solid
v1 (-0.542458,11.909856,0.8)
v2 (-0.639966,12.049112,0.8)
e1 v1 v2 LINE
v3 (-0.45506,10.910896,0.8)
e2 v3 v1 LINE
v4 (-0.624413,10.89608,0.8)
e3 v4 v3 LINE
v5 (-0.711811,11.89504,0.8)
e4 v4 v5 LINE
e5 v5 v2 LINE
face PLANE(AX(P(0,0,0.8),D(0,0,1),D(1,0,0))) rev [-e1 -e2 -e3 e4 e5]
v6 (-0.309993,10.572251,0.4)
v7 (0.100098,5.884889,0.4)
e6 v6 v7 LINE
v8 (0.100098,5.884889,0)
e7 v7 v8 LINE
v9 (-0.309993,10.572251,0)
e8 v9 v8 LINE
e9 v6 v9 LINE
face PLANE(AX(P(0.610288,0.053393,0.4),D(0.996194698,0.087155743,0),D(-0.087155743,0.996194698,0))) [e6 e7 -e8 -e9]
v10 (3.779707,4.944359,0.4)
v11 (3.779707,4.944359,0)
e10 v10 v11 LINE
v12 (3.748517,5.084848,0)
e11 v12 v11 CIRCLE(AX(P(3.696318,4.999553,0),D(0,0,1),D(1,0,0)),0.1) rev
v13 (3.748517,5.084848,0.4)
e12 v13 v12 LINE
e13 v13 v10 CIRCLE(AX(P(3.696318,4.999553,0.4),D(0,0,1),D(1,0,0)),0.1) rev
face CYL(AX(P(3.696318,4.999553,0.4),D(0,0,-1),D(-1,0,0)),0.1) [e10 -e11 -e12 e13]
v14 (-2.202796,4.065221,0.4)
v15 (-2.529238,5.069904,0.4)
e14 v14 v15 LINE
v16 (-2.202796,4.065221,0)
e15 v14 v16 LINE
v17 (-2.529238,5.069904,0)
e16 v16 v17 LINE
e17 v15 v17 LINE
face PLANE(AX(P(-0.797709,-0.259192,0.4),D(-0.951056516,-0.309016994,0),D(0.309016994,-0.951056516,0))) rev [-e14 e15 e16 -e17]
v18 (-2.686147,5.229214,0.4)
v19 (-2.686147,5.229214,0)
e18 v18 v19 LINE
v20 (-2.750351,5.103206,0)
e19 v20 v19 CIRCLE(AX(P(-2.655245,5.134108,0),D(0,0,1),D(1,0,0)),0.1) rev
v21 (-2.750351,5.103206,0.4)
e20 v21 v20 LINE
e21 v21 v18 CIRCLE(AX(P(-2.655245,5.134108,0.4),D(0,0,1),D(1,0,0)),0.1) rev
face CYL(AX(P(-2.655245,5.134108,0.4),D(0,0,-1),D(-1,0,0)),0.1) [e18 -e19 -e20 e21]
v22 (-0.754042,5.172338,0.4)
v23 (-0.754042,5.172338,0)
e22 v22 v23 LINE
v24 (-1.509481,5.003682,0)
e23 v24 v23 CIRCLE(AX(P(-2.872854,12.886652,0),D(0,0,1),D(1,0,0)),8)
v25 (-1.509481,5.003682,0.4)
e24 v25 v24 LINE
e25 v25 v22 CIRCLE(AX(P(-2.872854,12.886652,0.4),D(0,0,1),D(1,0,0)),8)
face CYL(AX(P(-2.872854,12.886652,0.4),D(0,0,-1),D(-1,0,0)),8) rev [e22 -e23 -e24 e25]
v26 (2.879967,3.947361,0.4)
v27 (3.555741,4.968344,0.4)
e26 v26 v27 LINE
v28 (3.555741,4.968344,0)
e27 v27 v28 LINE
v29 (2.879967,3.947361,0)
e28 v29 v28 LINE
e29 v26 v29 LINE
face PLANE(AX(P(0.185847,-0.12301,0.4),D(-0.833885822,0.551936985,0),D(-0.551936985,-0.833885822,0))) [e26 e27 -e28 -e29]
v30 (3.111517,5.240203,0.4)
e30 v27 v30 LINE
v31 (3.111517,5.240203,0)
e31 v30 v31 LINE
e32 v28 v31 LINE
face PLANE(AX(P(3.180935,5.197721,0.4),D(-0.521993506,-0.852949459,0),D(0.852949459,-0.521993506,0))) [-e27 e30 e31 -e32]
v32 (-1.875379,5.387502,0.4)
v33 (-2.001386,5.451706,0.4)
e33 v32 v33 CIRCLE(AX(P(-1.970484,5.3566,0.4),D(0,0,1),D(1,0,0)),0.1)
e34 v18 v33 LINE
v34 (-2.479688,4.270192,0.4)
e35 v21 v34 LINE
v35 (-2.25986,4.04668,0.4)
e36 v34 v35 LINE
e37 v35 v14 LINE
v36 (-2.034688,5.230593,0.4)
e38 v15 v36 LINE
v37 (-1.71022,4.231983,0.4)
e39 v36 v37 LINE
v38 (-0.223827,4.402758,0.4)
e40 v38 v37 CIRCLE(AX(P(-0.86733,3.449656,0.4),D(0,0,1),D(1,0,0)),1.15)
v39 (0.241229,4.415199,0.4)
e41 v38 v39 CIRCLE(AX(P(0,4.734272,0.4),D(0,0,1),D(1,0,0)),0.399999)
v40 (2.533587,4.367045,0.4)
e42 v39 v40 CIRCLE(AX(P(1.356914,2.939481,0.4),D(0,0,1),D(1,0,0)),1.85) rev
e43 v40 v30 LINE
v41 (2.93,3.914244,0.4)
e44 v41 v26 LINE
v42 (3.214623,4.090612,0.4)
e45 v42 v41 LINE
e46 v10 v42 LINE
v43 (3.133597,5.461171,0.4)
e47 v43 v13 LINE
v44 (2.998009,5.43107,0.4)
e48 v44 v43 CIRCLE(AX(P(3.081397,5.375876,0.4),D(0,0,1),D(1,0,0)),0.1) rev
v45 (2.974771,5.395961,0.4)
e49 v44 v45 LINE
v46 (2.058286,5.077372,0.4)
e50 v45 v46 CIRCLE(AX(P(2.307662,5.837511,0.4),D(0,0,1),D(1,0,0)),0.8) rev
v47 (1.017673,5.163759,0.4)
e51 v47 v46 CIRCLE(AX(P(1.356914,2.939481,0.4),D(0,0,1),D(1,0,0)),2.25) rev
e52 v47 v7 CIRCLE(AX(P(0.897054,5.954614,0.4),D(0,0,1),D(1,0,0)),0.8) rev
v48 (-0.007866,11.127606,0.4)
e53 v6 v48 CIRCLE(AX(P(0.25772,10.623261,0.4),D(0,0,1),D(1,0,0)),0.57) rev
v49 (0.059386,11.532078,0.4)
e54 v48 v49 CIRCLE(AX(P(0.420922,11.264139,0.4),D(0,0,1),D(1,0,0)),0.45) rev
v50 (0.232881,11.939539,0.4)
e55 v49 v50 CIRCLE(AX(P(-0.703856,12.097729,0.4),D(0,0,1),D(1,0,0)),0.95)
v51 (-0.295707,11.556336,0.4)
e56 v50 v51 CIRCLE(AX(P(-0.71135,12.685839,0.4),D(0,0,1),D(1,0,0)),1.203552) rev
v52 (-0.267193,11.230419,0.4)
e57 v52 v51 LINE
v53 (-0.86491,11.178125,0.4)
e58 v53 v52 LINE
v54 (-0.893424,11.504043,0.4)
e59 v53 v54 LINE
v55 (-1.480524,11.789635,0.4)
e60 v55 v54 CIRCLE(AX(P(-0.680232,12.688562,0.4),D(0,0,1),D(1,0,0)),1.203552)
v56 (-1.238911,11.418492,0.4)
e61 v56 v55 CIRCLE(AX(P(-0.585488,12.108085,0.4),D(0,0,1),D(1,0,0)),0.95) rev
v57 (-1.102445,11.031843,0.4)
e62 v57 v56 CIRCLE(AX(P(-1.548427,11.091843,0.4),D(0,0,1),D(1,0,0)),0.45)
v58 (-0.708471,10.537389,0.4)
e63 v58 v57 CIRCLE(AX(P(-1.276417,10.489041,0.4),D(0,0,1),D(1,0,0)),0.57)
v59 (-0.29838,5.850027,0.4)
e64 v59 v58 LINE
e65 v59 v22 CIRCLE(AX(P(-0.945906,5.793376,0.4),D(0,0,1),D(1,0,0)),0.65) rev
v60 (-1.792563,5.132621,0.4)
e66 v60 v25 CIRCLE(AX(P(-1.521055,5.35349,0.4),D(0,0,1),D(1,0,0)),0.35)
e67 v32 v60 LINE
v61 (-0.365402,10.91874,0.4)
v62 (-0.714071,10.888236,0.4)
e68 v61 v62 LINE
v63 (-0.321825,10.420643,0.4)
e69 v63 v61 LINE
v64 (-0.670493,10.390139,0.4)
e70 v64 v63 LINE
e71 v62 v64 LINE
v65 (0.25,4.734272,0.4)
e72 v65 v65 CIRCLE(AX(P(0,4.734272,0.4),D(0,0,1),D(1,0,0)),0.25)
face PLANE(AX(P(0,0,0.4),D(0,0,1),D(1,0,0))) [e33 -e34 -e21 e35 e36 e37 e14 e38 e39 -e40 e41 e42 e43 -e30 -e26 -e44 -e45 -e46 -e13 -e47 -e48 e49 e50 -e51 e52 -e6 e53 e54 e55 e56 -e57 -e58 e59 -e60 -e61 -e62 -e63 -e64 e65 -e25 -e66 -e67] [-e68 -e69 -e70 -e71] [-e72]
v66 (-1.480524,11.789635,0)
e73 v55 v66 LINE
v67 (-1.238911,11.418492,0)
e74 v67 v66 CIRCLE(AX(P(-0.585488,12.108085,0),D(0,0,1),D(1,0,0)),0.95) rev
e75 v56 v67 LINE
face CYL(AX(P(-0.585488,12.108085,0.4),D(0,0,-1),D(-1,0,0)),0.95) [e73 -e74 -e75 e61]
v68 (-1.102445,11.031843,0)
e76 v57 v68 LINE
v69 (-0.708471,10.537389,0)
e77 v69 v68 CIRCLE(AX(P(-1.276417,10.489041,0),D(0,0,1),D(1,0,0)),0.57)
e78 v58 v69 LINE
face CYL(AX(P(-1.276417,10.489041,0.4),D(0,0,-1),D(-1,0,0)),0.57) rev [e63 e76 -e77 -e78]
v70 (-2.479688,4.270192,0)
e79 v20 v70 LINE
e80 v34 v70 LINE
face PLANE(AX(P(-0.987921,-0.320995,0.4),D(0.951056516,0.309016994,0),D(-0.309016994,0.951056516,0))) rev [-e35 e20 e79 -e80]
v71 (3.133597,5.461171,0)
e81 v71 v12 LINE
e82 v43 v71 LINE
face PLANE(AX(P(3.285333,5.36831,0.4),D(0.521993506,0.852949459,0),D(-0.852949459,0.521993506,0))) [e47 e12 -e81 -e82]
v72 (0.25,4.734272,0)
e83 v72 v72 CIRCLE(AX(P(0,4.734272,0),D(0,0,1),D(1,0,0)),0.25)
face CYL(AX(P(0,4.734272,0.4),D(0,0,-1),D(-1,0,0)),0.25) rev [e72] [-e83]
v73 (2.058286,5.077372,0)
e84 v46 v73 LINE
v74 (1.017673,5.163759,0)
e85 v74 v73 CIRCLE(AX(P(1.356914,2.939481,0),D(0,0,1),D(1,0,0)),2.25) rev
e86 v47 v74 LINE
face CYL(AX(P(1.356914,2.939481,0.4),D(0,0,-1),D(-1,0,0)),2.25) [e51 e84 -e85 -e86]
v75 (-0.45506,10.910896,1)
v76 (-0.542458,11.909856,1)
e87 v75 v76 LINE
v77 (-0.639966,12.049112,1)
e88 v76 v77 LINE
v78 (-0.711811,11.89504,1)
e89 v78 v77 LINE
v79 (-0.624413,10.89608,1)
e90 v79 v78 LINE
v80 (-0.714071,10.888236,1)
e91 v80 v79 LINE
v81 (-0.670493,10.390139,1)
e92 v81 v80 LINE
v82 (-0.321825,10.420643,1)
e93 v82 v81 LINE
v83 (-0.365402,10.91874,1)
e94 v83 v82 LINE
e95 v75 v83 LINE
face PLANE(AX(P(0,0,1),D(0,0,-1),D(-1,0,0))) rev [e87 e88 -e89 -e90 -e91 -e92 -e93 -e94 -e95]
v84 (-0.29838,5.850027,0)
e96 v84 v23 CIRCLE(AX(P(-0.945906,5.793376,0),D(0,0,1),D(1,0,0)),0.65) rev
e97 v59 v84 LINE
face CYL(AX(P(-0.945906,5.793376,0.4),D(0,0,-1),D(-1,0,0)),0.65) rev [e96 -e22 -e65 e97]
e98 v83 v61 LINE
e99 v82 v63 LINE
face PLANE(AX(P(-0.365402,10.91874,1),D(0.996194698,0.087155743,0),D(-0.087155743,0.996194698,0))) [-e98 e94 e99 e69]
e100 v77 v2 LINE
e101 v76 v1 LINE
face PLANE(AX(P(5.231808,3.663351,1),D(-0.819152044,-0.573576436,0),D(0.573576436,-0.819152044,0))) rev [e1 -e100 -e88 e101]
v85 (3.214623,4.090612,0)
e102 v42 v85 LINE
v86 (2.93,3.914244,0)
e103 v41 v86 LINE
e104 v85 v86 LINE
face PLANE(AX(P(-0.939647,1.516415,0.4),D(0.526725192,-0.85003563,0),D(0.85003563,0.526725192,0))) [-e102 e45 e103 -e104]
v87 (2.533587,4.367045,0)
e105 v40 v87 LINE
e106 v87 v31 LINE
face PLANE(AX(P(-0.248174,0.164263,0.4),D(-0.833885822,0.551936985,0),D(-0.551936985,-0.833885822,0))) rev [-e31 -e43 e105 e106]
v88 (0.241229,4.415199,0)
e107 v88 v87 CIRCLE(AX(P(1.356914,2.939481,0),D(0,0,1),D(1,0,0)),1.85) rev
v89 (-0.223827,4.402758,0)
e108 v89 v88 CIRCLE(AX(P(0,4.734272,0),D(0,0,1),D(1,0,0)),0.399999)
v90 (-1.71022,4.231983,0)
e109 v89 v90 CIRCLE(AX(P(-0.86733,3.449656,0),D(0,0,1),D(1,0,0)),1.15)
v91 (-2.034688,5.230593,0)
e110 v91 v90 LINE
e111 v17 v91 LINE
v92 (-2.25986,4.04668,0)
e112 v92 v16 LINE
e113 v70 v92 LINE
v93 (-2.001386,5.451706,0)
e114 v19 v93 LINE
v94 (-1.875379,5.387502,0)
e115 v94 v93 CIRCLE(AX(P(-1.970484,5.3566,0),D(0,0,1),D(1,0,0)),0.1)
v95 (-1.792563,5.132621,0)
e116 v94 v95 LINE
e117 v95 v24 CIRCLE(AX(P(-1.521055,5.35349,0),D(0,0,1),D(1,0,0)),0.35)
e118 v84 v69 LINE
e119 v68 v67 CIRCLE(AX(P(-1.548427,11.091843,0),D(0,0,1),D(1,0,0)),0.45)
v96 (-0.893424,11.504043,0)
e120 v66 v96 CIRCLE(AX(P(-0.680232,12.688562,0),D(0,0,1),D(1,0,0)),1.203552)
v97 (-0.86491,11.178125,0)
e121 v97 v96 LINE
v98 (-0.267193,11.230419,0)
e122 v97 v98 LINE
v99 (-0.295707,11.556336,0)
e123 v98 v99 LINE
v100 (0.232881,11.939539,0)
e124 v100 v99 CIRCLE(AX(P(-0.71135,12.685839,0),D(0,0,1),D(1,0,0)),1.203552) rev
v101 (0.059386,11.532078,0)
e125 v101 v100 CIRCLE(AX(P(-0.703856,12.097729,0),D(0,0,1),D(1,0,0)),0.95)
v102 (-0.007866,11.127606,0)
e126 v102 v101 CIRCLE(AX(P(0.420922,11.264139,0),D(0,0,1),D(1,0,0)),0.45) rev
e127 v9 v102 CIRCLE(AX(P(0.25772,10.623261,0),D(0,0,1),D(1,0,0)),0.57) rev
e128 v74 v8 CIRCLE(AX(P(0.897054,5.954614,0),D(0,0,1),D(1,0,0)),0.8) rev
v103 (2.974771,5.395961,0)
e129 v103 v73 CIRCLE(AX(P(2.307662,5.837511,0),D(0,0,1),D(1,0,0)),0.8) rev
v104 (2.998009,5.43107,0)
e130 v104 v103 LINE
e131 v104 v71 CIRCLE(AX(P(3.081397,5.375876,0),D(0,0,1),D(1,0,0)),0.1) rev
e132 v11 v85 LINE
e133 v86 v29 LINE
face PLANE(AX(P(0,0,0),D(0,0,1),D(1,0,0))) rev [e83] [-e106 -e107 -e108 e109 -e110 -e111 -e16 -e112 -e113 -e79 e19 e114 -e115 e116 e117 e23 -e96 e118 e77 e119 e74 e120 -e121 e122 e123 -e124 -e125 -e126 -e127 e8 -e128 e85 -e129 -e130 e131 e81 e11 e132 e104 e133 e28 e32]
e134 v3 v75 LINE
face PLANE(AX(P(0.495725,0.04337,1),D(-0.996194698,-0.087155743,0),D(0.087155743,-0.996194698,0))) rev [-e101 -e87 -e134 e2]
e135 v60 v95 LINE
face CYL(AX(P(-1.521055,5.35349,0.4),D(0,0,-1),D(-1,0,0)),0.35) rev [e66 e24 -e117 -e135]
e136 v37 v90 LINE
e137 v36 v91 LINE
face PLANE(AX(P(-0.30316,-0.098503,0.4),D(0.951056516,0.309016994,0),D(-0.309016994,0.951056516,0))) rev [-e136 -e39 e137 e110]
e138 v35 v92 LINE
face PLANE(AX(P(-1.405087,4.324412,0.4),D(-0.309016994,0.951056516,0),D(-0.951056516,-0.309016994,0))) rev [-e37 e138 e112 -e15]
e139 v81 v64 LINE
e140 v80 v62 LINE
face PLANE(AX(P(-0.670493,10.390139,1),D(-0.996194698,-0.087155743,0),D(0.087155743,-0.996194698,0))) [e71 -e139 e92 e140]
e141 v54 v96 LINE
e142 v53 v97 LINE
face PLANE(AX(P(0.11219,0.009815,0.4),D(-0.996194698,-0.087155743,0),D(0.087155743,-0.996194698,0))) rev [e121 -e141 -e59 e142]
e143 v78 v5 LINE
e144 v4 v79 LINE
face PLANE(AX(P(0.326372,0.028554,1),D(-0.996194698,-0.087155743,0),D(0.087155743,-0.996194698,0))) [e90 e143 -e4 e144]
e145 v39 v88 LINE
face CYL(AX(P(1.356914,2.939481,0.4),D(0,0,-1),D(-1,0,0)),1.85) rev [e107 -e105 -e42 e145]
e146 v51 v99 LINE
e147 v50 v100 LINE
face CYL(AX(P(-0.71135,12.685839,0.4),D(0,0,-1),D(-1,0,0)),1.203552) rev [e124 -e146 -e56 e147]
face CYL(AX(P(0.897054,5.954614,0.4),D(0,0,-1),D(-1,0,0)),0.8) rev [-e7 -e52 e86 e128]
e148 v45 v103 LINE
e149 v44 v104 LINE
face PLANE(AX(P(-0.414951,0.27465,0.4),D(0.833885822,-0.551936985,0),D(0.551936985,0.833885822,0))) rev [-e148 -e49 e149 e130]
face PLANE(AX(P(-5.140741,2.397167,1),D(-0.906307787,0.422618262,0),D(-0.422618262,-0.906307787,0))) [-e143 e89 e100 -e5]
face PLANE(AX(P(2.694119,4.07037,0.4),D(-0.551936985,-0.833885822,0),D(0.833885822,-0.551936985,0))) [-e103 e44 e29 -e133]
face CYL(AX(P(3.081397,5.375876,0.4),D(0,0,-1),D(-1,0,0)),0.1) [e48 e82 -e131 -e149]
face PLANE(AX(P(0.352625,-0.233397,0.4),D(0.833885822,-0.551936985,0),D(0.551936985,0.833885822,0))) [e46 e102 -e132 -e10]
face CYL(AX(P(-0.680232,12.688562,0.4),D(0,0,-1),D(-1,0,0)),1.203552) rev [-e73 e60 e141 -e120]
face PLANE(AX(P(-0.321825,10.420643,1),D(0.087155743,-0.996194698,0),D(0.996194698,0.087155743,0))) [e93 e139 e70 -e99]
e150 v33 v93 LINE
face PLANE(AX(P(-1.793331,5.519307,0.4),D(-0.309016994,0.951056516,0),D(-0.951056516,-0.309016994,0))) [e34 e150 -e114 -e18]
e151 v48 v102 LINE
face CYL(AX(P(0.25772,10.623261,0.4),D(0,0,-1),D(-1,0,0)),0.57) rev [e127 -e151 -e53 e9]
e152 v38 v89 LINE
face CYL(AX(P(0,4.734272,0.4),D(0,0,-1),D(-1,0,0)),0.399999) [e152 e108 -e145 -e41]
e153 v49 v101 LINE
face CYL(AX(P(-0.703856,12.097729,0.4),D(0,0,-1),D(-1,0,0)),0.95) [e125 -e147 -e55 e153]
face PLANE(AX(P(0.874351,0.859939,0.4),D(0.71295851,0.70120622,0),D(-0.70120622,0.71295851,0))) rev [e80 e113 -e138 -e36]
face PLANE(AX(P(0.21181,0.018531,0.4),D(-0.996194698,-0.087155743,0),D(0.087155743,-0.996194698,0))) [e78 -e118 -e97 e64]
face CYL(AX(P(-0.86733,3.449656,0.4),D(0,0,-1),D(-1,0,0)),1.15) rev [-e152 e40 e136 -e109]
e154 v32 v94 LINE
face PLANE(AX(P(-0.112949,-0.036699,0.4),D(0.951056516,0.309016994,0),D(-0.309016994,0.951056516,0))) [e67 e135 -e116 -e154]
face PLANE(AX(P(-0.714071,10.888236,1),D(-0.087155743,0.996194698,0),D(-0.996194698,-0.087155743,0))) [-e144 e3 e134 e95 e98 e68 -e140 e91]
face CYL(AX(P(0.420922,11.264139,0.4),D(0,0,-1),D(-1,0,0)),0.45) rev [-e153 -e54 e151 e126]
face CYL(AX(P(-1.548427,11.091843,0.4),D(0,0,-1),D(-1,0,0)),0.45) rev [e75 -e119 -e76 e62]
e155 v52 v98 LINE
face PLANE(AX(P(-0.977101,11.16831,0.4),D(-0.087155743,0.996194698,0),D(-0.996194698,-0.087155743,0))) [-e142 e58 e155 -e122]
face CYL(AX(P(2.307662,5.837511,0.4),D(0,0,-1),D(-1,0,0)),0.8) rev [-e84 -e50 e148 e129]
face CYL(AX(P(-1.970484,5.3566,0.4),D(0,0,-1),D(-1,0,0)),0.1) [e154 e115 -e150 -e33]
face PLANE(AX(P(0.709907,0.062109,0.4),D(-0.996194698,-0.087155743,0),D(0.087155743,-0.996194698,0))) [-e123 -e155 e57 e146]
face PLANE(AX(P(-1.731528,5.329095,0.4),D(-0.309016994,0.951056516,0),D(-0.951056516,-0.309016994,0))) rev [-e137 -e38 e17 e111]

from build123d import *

# Parameters (mm, degrees)
BOSS_EXTRUDE1_OUTLINE_R = 0.25
BOSS_EXTRUDE1_DEPTH     = 0.4
BOSS_EXTRUDE2_DEPTH     = 1
BOSS_EXTRUDE3_START     = 0.8
BOSS_EXTRUDE3_DEPTH     = 0.2


# Read off the part's stored shape, not the designer's step: Boss-Extrude1
with BuildPart() as part:
    # Boss-Extrude1 outline → Boss-Extrude1 (new body)
    with BuildSketch(Plane.XY):
        with BuildLine():
            ThreePointArc((0.232880573, 11.939538652), (-0.004933085, 11.711410613), (-0.295707305, 11.556336146))
            Line((-0.295707305, 11.556336146), (-0.267193244, 11.23041893))
            Line((-0.267193244, 11.23041893), (-0.864910062, 11.178125485))
            Line((-0.864910062, 11.178125485), (-0.893424124, 11.5040427))
            ThreePointArc((-0.893424124, 11.5040427), (-1.206709229, 11.606268825), (-1.480523981, 11.789635178))
            ThreePointArc((-1.480523981, 11.789635178), (-1.381646187, 11.58978807), (-1.238910718, 11.418492212))
            ThreePointArc((-1.238910718, 11.418492212), (-1.124081641, 11.241613378), (-1.102444702, 11.031842833))
            ThreePointArc((-1.102444702, 11.031842833), (-0.830623384, 10.84424284), (-0.708470889, 10.537388877))
            Line((-0.708470889, 10.537388877), (-0.298379869, 5.850027068))
            ThreePointArc((-0.298379869, 5.850027068), (-0.406499279, 5.430691492), (-0.75404158, 5.172338089))
            ThreePointArc((-0.75404158, 5.172338089), (-1.129720091, 5.078868092), (-1.509480558, 5.003681847))
            ThreePointArc((-1.509480558, 5.003681847), (-1.666132979, 5.034974657), (-1.792562668, 5.132620725))
            Line((-1.792562668, 5.132620725), (-1.875378571, 5.387501866))
            ThreePointArc((-1.875378571, 5.387501866), (-1.925085173, 5.445700819), (-2.001385922, 5.451705818))
            Line((-2.001385922, 5.451705818), (-2.686146614, 5.229213582))
            ThreePointArc((-2.686146614, 5.229213582), (-2.744345567, 5.179506981), (-2.750350566, 5.103206231))
            Line((-2.750350566, 5.103206231), (-2.479687932, 4.270192298))
            Line((-2.479687932, 4.270192298), (-2.259859524, 4.046679542))
            Line((-2.259859524, 4.046679542), (-2.202796133, 4.065220562))
            Line((-2.202796133, 4.065220562), (-2.529237563, 5.069903979))
            Line((-2.529237563, 5.069903979), (-2.034688175, 5.230592816))
            Line((-2.034688175, 5.230592816), (-1.710220331, 4.231983473))
            ThreePointArc((-1.710220331, 4.231983473), (-0.998592576, 4.592140334), (-0.223827126, 4.40275838))
            ThreePointArc((-0.223827126, 4.40275838), (0.010695557, 4.334415883), (0.241228985, 4.415198467))
            ThreePointArc((0.241228985, 4.415198467), (1.395767253, 4.789072574), (2.533587129, 4.367045296))
            Line((2.533587129, 4.367045296), (3.111517477, 5.240202804))
            Line((3.111517477, 5.240202804), (3.555740915, 4.968344082))
            Line((3.555740915, 4.968344082), (2.879966638, 3.947360522))
            Line((2.879966638, 3.947360522), (2.929999788, 3.914244302))
            Line((2.929999788, 3.914244302), (3.214623401, 4.09061153))
            Line((3.214623401, 4.09061153), (3.779706708, 4.944359277))
            ThreePointArc((3.779706708, 4.944359277), (3.793941313, 5.021225846), (3.748517476, 5.084847921))
            Line((3.748517476, 5.084847921), (3.133596604, 5.46117116))
            ThreePointArc((3.133596604, 5.46117116), (3.059724383, 5.473499401), (2.998008671, 5.431069912))
            Line((2.998008671, 5.431069912), (2.974770776, 5.395961283))
            ThreePointArc((2.974770776, 5.395961283), (2.570340353, 5.081865355), (2.058285642, 5.077371822))
            ThreePointArc((2.058285642, 5.077371822), (1.543060021, 5.181767476), (1.017672926, 5.163759347))
            ThreePointArc((1.017672926, 5.163759347), (0.40272096, 5.32561867), (0.10009801, 5.884889365))
            Line((0.10009801, 5.884889365), (-0.30999301, 10.572251175))
            ThreePointArc((-0.30999301, 10.572251175), (-0.242980918, 10.895654894), (-0.007865573, 11.127606098))
            ThreePointArc((-0.007865573, 11.127606098), (-0.022983621, 11.337946973), (0.059386258, 11.53207848))
            ThreePointArc((0.059386258, 11.53207848), (0.170208041, 11.725557722), (0.232880573, 11.939538652))
        make_face()
        with Locations((0, 4.734272207)):
            Circle(BOSS_EXTRUDE1_OUTLINE_R, mode=Mode.SUBTRACT)
    extrude(amount=BOSS_EXTRUDE1_DEPTH)

    # Sketch1<8> → Boss-Extrude2 (add)
    with BuildSketch(Plane.XY):
        Polygon((-0.365402387, 10.918740425), (-0.321824516, 10.420643076), (-0.67049266, 10.390138566), (-0.714070532, 10.888235915), align=None)
    extrude(amount=BOSS_EXTRUDE2_DEPTH)

    # Sketch1<9> → Boss-Extrude3 (add)
    with BuildSketch(Plane.XY.offset(BOSS_EXTRUDE3_START)):
        Polygon((-0.624413009, 10.896079932), (-0.45505991, 10.910896408), (-0.54245757, 11.909856226), (-0.639965564, 12.049112073), (-0.711810668, 11.895039749), align=None)
    extrude(amount=BOSS_EXTRUDE3_DEPTH)


solid = part.part
